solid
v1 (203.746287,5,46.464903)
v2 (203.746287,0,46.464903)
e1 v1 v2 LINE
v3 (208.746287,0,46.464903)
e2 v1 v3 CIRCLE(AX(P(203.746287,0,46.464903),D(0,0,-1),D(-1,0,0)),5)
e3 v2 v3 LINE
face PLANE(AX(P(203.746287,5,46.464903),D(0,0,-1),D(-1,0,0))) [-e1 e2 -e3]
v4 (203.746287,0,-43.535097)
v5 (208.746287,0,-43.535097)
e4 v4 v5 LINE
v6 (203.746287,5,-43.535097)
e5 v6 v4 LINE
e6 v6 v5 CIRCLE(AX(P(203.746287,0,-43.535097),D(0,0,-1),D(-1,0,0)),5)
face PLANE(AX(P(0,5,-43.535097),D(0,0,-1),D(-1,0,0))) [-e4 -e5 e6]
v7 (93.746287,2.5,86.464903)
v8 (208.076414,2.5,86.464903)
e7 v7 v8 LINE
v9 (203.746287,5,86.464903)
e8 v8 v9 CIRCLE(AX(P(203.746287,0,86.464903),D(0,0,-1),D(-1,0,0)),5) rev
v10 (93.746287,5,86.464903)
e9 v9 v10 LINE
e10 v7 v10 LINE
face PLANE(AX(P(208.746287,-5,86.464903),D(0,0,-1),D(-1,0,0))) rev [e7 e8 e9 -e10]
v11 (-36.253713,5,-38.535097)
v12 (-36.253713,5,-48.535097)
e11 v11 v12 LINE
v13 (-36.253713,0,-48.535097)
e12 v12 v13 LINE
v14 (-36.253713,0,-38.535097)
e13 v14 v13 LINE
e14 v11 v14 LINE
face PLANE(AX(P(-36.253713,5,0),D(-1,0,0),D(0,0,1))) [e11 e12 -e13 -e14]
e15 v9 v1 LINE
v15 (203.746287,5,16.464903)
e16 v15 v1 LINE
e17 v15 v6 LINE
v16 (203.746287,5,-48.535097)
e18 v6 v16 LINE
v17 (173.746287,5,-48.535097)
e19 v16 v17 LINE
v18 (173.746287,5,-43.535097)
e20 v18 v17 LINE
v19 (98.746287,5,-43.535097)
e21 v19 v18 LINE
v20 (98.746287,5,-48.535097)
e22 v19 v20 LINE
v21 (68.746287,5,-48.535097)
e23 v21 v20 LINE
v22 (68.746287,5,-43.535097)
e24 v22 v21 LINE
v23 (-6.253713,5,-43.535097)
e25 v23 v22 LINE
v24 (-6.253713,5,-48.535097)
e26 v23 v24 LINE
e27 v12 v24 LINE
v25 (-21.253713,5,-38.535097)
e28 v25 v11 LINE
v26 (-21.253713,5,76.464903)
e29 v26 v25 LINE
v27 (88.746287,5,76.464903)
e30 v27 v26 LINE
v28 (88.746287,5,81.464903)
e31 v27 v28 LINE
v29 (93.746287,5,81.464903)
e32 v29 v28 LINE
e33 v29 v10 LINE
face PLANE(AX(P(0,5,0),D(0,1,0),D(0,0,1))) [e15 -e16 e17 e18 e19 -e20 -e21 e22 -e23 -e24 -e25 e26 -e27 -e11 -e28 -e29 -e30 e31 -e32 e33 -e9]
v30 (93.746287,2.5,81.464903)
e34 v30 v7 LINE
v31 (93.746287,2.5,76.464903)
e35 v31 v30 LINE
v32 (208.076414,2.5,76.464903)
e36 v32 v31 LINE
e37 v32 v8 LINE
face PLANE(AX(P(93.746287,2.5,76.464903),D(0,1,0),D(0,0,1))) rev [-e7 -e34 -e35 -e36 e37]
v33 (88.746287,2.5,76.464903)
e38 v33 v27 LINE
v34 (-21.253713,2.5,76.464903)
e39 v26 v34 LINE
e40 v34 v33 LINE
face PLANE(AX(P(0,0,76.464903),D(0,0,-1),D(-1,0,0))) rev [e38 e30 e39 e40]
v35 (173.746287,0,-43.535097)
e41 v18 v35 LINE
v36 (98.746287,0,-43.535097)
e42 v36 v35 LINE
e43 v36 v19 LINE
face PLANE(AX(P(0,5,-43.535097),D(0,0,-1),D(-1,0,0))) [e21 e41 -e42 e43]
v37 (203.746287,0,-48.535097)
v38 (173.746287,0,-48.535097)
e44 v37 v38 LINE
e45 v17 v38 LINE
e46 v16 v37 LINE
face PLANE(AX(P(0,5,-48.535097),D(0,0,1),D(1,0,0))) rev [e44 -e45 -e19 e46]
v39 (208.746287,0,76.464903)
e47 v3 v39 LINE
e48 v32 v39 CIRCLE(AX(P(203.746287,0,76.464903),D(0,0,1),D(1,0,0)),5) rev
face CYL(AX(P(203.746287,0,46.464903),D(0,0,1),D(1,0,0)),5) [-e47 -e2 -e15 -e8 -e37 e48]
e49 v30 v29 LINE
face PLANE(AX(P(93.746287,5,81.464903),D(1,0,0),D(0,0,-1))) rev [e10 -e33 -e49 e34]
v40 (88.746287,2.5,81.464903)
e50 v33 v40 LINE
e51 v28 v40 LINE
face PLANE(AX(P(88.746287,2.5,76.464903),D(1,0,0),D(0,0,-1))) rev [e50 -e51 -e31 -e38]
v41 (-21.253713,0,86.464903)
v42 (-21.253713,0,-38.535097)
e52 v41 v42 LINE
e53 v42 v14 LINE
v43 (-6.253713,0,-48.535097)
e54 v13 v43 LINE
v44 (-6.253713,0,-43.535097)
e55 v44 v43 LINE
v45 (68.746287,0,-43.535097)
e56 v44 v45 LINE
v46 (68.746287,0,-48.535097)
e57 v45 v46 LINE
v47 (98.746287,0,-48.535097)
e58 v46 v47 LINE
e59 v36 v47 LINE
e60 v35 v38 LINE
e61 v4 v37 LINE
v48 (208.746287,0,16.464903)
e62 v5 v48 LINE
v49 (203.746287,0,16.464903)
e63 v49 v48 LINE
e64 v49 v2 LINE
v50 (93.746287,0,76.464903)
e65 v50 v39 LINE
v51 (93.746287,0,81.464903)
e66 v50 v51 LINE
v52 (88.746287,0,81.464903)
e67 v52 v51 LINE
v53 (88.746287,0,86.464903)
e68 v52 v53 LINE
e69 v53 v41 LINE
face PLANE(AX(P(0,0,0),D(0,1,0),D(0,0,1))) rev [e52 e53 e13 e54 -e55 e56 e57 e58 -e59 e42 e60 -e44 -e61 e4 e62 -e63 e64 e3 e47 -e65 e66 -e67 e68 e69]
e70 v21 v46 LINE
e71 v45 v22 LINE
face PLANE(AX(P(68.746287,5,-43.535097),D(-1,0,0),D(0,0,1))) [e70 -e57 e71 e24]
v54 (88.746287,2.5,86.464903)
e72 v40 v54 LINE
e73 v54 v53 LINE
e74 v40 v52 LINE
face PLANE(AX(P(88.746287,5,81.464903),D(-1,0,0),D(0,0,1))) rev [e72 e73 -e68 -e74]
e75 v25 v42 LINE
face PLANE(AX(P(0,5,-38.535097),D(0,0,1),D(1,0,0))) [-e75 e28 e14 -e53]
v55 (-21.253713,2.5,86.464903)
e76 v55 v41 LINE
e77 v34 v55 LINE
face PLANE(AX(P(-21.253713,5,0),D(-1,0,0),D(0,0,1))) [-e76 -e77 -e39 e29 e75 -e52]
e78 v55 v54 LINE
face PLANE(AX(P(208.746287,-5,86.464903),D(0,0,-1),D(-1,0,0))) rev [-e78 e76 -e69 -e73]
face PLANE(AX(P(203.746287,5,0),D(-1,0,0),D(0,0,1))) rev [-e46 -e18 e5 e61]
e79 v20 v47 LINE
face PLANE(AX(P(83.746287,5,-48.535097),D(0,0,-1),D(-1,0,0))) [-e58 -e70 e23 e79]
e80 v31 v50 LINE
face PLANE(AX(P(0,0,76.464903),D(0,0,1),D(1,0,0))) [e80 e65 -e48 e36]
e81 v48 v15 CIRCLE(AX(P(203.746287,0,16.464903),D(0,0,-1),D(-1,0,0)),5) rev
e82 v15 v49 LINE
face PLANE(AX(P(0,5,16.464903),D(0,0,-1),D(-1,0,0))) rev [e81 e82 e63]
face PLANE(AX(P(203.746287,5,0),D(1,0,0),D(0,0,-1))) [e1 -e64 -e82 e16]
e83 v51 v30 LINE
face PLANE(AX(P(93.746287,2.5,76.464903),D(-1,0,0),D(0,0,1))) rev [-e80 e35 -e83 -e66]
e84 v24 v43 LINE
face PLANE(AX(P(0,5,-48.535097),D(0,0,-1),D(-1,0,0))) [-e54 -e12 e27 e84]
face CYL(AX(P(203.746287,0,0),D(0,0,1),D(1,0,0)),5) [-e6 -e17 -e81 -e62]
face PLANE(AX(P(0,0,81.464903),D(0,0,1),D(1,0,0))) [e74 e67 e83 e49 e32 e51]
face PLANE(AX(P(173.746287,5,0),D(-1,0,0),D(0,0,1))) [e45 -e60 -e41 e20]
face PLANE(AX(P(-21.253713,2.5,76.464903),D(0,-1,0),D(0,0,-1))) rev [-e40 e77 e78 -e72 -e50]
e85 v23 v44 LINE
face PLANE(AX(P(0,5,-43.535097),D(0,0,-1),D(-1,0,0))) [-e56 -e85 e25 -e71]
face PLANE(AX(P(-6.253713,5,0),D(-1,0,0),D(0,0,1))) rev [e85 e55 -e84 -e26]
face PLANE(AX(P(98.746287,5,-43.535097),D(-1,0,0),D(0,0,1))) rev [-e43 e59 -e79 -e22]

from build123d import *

# Parameters (mm, degrees)
SKETCH_1_W          = 5
SKETCH_1_H          = 60
SKETCH_1_W_2        = 30
SKETCH_1_H_2        = 5
SKETCH_1_W_3        = 15
EXTRUDE_1_DEPTH     = 5
FILLET_1_R          = 5
SKETCH_2_W          = 239.490005879
SKETCH_2_H          = 213.108485662
CUT_EXTRUDE_2_DEPTH = 10
SKETCH_3_W          = 110
SKETCH_3_H          = 2.5
SKETCH_3_W_2        = 115
CUT_EXTRUDE_3_DEPTH = 10
SKETCH_4_W          = 5
SKETCH_4_H          = 5
CUT_EXTRUDE_4_DEPTH = 5


with BuildPart() as part:
    # 草圖1 → 填料-伸長1 (new body)
    with BuildSketch(Plane(origin=(0, 0, 0), x_dir=(1, 0, 0), z_dir=(0, 1, 0))):
        Polygon((198.746286718, -286.464902661), (198.746286718, -256.464902661), (183.246286718, -256.464902661), (183.246286718, -266.464902661), (124.746286718, -266.464902661), (124.746286718, -262.464902661), (109.246286718, -262.464902661), (109.246286718, -266.464902661), (-21.253713282, -266.464902661), (-21.253713282, 38.535097339), (-36.253713282, 38.535097339), (-36.253713282, 43.535097339), (203.746286718, 43.535097339), (203.746286718, -286.464902661), align=None)
        with Locations((206.246286718, -256.464902661)):
            Rectangle(SKETCH_1_W, SKETCH_1_H)
        with Locations((206.246286718, 13.535097339)):
            Rectangle(SKETCH_1_W, SKETCH_1_H)
        with Locations((188.746286718, 46.035097339)):
            Rectangle(SKETCH_1_W_2, SKETCH_1_H_2)
        with Locations((-21.253713282, 46.035097339)):
            Rectangle(SKETCH_1_W_2, SKETCH_1_H_2)
        with Locations((91.246286718, 46.035097339)):
            Rectangle(SKETCH_1_W_3, SKETCH_1_H_2)
        with Locations((76.246286718, 46.035097339)):
            Rectangle(SKETCH_1_W_3, SKETCH_1_H_2)
        with Locations((206.246286718, -166.464902661)):
            Rectangle(SKETCH_1_W, SKETCH_1_H)
        with Locations((206.246286718, -76.464902661)):
            Rectangle(SKETCH_1_W, SKETCH_1_H)
    extrude(amount=EXTRUDE_1_DEPTH)

    # 圓角1
    fillet_1_edges = [part.edges().sort_by_distance(p)[0] for p in [
        (208.746286718, 5, -13.535097339),
        (208.746286718, 5, 76.464902661),
        (208.746286718, 5, 166.464902661),
        (208.746286718, 5, 256.464902661),
    ]]
    fillet(fillet_1_edges, radius=FILLET_1_R - 0.0001)  # a hair under: the kernel refuses the full size

    # 草圖2 → 除料-伸長2 (cut)
    with BuildSketch(Plane(origin=(0, 5, 0), x_dir=(1, 0, 0), z_dir=(0, 1, 0))):
        with Locations((89.001283779, -193.019145492)):
            Rectangle(SKETCH_2_W, SKETCH_2_H)
    extrude(amount=-CUT_EXTRUDE_2_DEPTH, mode=Mode.SUBTRACT)

    # 草圖3 → 除料-伸長3 (cut)
    with BuildSketch(Plane.XY.offset(86.464902661)):
        with Locations((33.746286718, 3.75)):
            Rectangle(SKETCH_3_W, SKETCH_3_H)
        with Locations((151.246286718, 1.25)):
            Rectangle(SKETCH_3_W_2, SKETCH_3_H)
    extrude(amount=-CUT_EXTRUDE_3_DEPTH, mode=Mode.SUBTRACT)

    # 草圖4 → 除料-伸長4 (cut)
    with BuildSketch(Plane.XY.offset(86.464902661)):
        with Locations((91.246286718, 2.5)):
            Rectangle(SKETCH_4_W, SKETCH_4_H)
    extrude(amount=-CUT_EXTRUDE_4_DEPTH, mode=Mode.SUBTRACT)


solid = part.part
